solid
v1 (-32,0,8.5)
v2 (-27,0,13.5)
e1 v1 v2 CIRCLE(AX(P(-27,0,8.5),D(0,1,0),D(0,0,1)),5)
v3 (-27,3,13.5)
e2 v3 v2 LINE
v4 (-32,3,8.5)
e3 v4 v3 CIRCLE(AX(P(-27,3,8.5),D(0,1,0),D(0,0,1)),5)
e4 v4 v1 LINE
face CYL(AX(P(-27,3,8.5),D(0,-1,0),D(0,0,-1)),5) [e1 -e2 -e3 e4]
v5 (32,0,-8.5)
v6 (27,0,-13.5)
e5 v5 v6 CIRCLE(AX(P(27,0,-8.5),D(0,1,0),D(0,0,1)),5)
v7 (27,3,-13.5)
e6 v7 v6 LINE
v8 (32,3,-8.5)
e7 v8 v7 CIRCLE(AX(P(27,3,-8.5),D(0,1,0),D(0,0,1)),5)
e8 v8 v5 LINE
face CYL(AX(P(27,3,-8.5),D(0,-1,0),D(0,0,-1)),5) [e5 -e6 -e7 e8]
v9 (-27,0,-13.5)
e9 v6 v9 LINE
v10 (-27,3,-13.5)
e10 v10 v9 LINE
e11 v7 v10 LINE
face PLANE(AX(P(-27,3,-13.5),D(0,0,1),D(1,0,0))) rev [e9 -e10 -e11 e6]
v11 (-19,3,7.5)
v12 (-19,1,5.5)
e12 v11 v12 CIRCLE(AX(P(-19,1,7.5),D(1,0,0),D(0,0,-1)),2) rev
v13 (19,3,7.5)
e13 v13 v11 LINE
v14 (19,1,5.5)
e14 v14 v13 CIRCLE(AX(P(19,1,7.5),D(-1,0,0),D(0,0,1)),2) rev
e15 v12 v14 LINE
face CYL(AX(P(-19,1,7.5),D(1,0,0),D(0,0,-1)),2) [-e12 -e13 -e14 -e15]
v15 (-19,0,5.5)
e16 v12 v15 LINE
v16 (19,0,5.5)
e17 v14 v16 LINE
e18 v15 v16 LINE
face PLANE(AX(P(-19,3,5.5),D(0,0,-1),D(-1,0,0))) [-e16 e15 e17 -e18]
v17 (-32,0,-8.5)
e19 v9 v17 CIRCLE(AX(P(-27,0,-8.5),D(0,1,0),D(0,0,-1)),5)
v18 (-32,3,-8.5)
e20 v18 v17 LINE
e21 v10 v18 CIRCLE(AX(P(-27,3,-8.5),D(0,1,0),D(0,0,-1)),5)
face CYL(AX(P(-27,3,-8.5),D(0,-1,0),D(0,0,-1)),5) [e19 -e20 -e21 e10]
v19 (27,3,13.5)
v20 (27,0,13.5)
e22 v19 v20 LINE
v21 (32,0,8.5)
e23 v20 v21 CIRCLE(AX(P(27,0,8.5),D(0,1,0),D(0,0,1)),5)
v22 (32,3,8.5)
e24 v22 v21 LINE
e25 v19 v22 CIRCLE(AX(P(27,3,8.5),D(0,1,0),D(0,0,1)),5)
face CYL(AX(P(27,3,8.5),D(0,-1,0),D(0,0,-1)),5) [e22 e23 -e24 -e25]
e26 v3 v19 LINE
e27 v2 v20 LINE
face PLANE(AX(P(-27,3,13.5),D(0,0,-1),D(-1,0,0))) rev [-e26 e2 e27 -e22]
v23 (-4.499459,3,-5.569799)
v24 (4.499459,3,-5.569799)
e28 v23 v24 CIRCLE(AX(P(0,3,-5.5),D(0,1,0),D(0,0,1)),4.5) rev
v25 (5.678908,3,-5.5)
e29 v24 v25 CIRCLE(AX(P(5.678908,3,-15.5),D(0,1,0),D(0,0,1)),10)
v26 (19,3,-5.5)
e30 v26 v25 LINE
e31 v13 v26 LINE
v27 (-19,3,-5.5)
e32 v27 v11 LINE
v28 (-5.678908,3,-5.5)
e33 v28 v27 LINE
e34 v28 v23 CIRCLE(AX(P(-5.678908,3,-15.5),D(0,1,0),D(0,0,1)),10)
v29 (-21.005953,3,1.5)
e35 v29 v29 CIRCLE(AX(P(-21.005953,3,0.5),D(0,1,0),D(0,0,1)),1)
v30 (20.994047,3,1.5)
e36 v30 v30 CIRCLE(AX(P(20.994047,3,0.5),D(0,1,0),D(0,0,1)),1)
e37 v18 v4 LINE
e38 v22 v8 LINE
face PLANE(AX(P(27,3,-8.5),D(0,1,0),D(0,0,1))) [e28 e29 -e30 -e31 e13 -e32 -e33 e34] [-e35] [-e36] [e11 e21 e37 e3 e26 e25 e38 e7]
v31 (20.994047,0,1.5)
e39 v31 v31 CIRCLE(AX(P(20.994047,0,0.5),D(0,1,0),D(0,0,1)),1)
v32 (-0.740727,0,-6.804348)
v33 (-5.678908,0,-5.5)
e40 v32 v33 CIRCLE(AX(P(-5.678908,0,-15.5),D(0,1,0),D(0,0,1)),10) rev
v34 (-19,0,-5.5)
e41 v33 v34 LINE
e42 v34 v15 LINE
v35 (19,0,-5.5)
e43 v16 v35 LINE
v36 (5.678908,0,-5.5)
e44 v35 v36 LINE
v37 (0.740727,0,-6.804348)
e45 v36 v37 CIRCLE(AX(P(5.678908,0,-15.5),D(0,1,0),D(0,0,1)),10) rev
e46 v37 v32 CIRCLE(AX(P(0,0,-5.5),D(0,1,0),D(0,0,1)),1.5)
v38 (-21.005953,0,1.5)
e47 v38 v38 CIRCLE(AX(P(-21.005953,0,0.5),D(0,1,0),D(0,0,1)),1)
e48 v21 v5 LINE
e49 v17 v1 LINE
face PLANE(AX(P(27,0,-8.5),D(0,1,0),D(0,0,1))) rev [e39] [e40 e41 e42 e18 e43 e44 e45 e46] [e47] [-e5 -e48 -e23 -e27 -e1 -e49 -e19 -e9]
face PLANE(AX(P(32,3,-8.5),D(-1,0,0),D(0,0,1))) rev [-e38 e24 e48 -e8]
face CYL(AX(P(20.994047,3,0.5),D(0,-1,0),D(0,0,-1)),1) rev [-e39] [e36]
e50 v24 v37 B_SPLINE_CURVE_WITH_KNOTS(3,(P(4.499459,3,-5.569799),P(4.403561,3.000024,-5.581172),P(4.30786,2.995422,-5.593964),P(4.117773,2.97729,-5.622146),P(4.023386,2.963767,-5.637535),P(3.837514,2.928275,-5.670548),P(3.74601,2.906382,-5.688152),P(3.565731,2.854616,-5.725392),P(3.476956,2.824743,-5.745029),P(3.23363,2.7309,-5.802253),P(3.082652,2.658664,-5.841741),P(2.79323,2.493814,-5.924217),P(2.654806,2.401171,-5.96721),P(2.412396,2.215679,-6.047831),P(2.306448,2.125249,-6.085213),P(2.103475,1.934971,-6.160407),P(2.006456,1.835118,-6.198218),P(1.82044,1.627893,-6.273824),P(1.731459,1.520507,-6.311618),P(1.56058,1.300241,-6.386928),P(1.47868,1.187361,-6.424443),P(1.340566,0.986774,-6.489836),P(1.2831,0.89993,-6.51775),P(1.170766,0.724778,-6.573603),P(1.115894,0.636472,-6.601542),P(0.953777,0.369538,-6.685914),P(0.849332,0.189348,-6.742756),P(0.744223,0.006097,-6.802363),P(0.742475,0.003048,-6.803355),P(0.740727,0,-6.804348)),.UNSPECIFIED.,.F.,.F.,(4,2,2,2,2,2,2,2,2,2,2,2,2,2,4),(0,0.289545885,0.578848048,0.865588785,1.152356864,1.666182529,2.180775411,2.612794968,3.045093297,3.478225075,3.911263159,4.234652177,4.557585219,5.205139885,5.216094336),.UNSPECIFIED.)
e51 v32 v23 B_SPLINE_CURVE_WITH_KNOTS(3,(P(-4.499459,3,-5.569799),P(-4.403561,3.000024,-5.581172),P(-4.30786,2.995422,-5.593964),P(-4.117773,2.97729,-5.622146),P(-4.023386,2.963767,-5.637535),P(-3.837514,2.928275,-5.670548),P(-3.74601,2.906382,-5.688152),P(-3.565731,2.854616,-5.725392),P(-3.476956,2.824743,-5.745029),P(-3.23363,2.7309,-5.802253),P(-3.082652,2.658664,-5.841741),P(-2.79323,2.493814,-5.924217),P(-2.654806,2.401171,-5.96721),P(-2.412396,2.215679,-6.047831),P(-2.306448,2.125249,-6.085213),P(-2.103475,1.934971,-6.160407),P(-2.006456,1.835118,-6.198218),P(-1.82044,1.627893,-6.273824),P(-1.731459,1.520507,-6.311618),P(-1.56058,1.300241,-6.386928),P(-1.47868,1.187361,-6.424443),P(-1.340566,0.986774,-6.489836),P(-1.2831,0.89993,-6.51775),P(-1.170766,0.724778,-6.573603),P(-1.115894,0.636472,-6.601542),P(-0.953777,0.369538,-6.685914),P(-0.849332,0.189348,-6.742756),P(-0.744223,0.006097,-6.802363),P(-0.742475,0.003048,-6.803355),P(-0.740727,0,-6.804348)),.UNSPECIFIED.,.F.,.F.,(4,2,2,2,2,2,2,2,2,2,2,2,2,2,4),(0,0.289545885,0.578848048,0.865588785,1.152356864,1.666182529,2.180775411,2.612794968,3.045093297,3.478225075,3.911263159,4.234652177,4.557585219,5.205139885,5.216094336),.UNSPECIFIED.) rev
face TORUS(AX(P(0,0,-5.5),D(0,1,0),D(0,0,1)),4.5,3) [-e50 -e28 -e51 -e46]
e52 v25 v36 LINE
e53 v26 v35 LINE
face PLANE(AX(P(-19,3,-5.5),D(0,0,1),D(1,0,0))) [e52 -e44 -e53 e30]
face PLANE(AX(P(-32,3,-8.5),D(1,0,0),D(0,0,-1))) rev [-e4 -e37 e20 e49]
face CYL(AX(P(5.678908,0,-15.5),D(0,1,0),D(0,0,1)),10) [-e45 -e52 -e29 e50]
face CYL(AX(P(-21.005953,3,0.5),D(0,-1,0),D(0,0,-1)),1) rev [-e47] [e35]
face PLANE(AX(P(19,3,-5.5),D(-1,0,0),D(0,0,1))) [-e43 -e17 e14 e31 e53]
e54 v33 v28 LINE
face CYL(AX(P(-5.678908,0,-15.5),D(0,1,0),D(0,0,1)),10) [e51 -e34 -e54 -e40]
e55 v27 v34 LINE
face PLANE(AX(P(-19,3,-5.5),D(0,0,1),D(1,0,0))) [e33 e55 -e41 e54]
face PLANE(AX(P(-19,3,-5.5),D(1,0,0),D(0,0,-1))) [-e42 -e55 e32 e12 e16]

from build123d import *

# Parameters (mm, degrees)
SKETCH1_R           = 1
SKETCH1_W           = 38
SKETCH1_H           = 11
MAIN_EXTRUDE_DEPTH  = 3
WIRE_CUT_DEPTH      = 35.860436027
WIRE_CUT_DEPTH_BACK = 35.860436027
SKETCH2_R           = 1.5
FILLET1_R           = 10
FILLET2_R           = 3
FILLET3_R           = 2


with BuildPart() as part:
    # Sketch1 → Main extrude (new body)
    with BuildSketch(Plane(origin=(0, 0, 0), x_dir=(1, 0, 0), z_dir=(0, 1, 0))):
        with BuildLine():
            Line((-32, 8.5), (-32, -8.5))
            ThreePointArc((-32, -8.5), (-30.535533906, -12.035533906), (-27, -13.5))
            Line((-27, -13.5), (27, -13.5))
            ThreePointArc((27, -13.5), (30.535533906, -12.035533906), (32, -8.5))
            Line((32, -8.5), (32, 8.5))
            ThreePointArc((32, 8.5), (30.535533906, 12.035533906), (27, 13.5))
            Line((27, 13.5), (-27, 13.5))
            ThreePointArc((-27, 13.5), (-30.535533906, 12.035533906), (-32, 8.5))
        make_face()
        with Locations(Location((-21.005953225, -0.5, 0), (0, 0, 270))):
            Circle(SKETCH1_R, mode=Mode.SUBTRACT)
        with Locations(Location((20.994046775, -0.5, 0), (0, 0, 270))):
            Circle(SKETCH1_R, mode=Mode.SUBTRACT)
        Rectangle(SKETCH1_W, SKETCH1_H, mode=Mode.SUBTRACT)
    extrude(amount=MAIN_EXTRUDE_DEPTH)

    # Sketch2 → Wire cut (cut, two sides: drawn at the far end of the back side and taken through both)
    with BuildSketch(Plane(origin=(0, 3, 0), x_dir=(1, 0, 0), z_dir=(0, 1, 0)).offset(-WIRE_CUT_DEPTH_BACK)):
        with Locations((0, 5.5)):
            Circle(SKETCH2_R)
    extrude(amount=WIRE_CUT_DEPTH + WIRE_CUT_DEPTH_BACK, mode=Mode.SUBTRACT)

    # Fillet1
    fillet1_edges = [part.edges().sort_by_distance(p)[0] for p in [
        (-1.5, 1.5, -5.5),
        (1.5, 1.5, -5.5),
    ]]
    fillet(fillet1_edges, radius=FILLET1_R)

    # Fillet2
    # the kernel refuses this fillet: 3 mm, written as the material it takes off along each edge
    with BuildSketch(Plane(origin=(0, 3, -5.5), x_dir=(0.003141587485879651, 0, 0.9999950652018582), z_dir=(-0.9999950652018582, 0, 0.003141587485879651))) as fillet2_piece_1:
        with BuildLine():
            CenterArc((1.5 + FILLET2_R, -FILLET2_R), FILLET2_R, 90, 90)
            Line((1.5 + FILLET2_R, 0), (1.5, 0))
            Line((1.5, 0), (1.5, -FILLET2_R))
        make_face()
    revolve(axis=Axis((0, 3, -5.5), (0, 1, 0)), revolution_arc=359.64, mode=Mode.SUBTRACT)

    # Fillet3
    fillet3_edges = [part.edges().sort_by_distance(p)[0] for p in [
        (0, 3, 5.5),
    ]]
    fillet(fillet3_edges, radius=FILLET3_R)


solid = part.part
